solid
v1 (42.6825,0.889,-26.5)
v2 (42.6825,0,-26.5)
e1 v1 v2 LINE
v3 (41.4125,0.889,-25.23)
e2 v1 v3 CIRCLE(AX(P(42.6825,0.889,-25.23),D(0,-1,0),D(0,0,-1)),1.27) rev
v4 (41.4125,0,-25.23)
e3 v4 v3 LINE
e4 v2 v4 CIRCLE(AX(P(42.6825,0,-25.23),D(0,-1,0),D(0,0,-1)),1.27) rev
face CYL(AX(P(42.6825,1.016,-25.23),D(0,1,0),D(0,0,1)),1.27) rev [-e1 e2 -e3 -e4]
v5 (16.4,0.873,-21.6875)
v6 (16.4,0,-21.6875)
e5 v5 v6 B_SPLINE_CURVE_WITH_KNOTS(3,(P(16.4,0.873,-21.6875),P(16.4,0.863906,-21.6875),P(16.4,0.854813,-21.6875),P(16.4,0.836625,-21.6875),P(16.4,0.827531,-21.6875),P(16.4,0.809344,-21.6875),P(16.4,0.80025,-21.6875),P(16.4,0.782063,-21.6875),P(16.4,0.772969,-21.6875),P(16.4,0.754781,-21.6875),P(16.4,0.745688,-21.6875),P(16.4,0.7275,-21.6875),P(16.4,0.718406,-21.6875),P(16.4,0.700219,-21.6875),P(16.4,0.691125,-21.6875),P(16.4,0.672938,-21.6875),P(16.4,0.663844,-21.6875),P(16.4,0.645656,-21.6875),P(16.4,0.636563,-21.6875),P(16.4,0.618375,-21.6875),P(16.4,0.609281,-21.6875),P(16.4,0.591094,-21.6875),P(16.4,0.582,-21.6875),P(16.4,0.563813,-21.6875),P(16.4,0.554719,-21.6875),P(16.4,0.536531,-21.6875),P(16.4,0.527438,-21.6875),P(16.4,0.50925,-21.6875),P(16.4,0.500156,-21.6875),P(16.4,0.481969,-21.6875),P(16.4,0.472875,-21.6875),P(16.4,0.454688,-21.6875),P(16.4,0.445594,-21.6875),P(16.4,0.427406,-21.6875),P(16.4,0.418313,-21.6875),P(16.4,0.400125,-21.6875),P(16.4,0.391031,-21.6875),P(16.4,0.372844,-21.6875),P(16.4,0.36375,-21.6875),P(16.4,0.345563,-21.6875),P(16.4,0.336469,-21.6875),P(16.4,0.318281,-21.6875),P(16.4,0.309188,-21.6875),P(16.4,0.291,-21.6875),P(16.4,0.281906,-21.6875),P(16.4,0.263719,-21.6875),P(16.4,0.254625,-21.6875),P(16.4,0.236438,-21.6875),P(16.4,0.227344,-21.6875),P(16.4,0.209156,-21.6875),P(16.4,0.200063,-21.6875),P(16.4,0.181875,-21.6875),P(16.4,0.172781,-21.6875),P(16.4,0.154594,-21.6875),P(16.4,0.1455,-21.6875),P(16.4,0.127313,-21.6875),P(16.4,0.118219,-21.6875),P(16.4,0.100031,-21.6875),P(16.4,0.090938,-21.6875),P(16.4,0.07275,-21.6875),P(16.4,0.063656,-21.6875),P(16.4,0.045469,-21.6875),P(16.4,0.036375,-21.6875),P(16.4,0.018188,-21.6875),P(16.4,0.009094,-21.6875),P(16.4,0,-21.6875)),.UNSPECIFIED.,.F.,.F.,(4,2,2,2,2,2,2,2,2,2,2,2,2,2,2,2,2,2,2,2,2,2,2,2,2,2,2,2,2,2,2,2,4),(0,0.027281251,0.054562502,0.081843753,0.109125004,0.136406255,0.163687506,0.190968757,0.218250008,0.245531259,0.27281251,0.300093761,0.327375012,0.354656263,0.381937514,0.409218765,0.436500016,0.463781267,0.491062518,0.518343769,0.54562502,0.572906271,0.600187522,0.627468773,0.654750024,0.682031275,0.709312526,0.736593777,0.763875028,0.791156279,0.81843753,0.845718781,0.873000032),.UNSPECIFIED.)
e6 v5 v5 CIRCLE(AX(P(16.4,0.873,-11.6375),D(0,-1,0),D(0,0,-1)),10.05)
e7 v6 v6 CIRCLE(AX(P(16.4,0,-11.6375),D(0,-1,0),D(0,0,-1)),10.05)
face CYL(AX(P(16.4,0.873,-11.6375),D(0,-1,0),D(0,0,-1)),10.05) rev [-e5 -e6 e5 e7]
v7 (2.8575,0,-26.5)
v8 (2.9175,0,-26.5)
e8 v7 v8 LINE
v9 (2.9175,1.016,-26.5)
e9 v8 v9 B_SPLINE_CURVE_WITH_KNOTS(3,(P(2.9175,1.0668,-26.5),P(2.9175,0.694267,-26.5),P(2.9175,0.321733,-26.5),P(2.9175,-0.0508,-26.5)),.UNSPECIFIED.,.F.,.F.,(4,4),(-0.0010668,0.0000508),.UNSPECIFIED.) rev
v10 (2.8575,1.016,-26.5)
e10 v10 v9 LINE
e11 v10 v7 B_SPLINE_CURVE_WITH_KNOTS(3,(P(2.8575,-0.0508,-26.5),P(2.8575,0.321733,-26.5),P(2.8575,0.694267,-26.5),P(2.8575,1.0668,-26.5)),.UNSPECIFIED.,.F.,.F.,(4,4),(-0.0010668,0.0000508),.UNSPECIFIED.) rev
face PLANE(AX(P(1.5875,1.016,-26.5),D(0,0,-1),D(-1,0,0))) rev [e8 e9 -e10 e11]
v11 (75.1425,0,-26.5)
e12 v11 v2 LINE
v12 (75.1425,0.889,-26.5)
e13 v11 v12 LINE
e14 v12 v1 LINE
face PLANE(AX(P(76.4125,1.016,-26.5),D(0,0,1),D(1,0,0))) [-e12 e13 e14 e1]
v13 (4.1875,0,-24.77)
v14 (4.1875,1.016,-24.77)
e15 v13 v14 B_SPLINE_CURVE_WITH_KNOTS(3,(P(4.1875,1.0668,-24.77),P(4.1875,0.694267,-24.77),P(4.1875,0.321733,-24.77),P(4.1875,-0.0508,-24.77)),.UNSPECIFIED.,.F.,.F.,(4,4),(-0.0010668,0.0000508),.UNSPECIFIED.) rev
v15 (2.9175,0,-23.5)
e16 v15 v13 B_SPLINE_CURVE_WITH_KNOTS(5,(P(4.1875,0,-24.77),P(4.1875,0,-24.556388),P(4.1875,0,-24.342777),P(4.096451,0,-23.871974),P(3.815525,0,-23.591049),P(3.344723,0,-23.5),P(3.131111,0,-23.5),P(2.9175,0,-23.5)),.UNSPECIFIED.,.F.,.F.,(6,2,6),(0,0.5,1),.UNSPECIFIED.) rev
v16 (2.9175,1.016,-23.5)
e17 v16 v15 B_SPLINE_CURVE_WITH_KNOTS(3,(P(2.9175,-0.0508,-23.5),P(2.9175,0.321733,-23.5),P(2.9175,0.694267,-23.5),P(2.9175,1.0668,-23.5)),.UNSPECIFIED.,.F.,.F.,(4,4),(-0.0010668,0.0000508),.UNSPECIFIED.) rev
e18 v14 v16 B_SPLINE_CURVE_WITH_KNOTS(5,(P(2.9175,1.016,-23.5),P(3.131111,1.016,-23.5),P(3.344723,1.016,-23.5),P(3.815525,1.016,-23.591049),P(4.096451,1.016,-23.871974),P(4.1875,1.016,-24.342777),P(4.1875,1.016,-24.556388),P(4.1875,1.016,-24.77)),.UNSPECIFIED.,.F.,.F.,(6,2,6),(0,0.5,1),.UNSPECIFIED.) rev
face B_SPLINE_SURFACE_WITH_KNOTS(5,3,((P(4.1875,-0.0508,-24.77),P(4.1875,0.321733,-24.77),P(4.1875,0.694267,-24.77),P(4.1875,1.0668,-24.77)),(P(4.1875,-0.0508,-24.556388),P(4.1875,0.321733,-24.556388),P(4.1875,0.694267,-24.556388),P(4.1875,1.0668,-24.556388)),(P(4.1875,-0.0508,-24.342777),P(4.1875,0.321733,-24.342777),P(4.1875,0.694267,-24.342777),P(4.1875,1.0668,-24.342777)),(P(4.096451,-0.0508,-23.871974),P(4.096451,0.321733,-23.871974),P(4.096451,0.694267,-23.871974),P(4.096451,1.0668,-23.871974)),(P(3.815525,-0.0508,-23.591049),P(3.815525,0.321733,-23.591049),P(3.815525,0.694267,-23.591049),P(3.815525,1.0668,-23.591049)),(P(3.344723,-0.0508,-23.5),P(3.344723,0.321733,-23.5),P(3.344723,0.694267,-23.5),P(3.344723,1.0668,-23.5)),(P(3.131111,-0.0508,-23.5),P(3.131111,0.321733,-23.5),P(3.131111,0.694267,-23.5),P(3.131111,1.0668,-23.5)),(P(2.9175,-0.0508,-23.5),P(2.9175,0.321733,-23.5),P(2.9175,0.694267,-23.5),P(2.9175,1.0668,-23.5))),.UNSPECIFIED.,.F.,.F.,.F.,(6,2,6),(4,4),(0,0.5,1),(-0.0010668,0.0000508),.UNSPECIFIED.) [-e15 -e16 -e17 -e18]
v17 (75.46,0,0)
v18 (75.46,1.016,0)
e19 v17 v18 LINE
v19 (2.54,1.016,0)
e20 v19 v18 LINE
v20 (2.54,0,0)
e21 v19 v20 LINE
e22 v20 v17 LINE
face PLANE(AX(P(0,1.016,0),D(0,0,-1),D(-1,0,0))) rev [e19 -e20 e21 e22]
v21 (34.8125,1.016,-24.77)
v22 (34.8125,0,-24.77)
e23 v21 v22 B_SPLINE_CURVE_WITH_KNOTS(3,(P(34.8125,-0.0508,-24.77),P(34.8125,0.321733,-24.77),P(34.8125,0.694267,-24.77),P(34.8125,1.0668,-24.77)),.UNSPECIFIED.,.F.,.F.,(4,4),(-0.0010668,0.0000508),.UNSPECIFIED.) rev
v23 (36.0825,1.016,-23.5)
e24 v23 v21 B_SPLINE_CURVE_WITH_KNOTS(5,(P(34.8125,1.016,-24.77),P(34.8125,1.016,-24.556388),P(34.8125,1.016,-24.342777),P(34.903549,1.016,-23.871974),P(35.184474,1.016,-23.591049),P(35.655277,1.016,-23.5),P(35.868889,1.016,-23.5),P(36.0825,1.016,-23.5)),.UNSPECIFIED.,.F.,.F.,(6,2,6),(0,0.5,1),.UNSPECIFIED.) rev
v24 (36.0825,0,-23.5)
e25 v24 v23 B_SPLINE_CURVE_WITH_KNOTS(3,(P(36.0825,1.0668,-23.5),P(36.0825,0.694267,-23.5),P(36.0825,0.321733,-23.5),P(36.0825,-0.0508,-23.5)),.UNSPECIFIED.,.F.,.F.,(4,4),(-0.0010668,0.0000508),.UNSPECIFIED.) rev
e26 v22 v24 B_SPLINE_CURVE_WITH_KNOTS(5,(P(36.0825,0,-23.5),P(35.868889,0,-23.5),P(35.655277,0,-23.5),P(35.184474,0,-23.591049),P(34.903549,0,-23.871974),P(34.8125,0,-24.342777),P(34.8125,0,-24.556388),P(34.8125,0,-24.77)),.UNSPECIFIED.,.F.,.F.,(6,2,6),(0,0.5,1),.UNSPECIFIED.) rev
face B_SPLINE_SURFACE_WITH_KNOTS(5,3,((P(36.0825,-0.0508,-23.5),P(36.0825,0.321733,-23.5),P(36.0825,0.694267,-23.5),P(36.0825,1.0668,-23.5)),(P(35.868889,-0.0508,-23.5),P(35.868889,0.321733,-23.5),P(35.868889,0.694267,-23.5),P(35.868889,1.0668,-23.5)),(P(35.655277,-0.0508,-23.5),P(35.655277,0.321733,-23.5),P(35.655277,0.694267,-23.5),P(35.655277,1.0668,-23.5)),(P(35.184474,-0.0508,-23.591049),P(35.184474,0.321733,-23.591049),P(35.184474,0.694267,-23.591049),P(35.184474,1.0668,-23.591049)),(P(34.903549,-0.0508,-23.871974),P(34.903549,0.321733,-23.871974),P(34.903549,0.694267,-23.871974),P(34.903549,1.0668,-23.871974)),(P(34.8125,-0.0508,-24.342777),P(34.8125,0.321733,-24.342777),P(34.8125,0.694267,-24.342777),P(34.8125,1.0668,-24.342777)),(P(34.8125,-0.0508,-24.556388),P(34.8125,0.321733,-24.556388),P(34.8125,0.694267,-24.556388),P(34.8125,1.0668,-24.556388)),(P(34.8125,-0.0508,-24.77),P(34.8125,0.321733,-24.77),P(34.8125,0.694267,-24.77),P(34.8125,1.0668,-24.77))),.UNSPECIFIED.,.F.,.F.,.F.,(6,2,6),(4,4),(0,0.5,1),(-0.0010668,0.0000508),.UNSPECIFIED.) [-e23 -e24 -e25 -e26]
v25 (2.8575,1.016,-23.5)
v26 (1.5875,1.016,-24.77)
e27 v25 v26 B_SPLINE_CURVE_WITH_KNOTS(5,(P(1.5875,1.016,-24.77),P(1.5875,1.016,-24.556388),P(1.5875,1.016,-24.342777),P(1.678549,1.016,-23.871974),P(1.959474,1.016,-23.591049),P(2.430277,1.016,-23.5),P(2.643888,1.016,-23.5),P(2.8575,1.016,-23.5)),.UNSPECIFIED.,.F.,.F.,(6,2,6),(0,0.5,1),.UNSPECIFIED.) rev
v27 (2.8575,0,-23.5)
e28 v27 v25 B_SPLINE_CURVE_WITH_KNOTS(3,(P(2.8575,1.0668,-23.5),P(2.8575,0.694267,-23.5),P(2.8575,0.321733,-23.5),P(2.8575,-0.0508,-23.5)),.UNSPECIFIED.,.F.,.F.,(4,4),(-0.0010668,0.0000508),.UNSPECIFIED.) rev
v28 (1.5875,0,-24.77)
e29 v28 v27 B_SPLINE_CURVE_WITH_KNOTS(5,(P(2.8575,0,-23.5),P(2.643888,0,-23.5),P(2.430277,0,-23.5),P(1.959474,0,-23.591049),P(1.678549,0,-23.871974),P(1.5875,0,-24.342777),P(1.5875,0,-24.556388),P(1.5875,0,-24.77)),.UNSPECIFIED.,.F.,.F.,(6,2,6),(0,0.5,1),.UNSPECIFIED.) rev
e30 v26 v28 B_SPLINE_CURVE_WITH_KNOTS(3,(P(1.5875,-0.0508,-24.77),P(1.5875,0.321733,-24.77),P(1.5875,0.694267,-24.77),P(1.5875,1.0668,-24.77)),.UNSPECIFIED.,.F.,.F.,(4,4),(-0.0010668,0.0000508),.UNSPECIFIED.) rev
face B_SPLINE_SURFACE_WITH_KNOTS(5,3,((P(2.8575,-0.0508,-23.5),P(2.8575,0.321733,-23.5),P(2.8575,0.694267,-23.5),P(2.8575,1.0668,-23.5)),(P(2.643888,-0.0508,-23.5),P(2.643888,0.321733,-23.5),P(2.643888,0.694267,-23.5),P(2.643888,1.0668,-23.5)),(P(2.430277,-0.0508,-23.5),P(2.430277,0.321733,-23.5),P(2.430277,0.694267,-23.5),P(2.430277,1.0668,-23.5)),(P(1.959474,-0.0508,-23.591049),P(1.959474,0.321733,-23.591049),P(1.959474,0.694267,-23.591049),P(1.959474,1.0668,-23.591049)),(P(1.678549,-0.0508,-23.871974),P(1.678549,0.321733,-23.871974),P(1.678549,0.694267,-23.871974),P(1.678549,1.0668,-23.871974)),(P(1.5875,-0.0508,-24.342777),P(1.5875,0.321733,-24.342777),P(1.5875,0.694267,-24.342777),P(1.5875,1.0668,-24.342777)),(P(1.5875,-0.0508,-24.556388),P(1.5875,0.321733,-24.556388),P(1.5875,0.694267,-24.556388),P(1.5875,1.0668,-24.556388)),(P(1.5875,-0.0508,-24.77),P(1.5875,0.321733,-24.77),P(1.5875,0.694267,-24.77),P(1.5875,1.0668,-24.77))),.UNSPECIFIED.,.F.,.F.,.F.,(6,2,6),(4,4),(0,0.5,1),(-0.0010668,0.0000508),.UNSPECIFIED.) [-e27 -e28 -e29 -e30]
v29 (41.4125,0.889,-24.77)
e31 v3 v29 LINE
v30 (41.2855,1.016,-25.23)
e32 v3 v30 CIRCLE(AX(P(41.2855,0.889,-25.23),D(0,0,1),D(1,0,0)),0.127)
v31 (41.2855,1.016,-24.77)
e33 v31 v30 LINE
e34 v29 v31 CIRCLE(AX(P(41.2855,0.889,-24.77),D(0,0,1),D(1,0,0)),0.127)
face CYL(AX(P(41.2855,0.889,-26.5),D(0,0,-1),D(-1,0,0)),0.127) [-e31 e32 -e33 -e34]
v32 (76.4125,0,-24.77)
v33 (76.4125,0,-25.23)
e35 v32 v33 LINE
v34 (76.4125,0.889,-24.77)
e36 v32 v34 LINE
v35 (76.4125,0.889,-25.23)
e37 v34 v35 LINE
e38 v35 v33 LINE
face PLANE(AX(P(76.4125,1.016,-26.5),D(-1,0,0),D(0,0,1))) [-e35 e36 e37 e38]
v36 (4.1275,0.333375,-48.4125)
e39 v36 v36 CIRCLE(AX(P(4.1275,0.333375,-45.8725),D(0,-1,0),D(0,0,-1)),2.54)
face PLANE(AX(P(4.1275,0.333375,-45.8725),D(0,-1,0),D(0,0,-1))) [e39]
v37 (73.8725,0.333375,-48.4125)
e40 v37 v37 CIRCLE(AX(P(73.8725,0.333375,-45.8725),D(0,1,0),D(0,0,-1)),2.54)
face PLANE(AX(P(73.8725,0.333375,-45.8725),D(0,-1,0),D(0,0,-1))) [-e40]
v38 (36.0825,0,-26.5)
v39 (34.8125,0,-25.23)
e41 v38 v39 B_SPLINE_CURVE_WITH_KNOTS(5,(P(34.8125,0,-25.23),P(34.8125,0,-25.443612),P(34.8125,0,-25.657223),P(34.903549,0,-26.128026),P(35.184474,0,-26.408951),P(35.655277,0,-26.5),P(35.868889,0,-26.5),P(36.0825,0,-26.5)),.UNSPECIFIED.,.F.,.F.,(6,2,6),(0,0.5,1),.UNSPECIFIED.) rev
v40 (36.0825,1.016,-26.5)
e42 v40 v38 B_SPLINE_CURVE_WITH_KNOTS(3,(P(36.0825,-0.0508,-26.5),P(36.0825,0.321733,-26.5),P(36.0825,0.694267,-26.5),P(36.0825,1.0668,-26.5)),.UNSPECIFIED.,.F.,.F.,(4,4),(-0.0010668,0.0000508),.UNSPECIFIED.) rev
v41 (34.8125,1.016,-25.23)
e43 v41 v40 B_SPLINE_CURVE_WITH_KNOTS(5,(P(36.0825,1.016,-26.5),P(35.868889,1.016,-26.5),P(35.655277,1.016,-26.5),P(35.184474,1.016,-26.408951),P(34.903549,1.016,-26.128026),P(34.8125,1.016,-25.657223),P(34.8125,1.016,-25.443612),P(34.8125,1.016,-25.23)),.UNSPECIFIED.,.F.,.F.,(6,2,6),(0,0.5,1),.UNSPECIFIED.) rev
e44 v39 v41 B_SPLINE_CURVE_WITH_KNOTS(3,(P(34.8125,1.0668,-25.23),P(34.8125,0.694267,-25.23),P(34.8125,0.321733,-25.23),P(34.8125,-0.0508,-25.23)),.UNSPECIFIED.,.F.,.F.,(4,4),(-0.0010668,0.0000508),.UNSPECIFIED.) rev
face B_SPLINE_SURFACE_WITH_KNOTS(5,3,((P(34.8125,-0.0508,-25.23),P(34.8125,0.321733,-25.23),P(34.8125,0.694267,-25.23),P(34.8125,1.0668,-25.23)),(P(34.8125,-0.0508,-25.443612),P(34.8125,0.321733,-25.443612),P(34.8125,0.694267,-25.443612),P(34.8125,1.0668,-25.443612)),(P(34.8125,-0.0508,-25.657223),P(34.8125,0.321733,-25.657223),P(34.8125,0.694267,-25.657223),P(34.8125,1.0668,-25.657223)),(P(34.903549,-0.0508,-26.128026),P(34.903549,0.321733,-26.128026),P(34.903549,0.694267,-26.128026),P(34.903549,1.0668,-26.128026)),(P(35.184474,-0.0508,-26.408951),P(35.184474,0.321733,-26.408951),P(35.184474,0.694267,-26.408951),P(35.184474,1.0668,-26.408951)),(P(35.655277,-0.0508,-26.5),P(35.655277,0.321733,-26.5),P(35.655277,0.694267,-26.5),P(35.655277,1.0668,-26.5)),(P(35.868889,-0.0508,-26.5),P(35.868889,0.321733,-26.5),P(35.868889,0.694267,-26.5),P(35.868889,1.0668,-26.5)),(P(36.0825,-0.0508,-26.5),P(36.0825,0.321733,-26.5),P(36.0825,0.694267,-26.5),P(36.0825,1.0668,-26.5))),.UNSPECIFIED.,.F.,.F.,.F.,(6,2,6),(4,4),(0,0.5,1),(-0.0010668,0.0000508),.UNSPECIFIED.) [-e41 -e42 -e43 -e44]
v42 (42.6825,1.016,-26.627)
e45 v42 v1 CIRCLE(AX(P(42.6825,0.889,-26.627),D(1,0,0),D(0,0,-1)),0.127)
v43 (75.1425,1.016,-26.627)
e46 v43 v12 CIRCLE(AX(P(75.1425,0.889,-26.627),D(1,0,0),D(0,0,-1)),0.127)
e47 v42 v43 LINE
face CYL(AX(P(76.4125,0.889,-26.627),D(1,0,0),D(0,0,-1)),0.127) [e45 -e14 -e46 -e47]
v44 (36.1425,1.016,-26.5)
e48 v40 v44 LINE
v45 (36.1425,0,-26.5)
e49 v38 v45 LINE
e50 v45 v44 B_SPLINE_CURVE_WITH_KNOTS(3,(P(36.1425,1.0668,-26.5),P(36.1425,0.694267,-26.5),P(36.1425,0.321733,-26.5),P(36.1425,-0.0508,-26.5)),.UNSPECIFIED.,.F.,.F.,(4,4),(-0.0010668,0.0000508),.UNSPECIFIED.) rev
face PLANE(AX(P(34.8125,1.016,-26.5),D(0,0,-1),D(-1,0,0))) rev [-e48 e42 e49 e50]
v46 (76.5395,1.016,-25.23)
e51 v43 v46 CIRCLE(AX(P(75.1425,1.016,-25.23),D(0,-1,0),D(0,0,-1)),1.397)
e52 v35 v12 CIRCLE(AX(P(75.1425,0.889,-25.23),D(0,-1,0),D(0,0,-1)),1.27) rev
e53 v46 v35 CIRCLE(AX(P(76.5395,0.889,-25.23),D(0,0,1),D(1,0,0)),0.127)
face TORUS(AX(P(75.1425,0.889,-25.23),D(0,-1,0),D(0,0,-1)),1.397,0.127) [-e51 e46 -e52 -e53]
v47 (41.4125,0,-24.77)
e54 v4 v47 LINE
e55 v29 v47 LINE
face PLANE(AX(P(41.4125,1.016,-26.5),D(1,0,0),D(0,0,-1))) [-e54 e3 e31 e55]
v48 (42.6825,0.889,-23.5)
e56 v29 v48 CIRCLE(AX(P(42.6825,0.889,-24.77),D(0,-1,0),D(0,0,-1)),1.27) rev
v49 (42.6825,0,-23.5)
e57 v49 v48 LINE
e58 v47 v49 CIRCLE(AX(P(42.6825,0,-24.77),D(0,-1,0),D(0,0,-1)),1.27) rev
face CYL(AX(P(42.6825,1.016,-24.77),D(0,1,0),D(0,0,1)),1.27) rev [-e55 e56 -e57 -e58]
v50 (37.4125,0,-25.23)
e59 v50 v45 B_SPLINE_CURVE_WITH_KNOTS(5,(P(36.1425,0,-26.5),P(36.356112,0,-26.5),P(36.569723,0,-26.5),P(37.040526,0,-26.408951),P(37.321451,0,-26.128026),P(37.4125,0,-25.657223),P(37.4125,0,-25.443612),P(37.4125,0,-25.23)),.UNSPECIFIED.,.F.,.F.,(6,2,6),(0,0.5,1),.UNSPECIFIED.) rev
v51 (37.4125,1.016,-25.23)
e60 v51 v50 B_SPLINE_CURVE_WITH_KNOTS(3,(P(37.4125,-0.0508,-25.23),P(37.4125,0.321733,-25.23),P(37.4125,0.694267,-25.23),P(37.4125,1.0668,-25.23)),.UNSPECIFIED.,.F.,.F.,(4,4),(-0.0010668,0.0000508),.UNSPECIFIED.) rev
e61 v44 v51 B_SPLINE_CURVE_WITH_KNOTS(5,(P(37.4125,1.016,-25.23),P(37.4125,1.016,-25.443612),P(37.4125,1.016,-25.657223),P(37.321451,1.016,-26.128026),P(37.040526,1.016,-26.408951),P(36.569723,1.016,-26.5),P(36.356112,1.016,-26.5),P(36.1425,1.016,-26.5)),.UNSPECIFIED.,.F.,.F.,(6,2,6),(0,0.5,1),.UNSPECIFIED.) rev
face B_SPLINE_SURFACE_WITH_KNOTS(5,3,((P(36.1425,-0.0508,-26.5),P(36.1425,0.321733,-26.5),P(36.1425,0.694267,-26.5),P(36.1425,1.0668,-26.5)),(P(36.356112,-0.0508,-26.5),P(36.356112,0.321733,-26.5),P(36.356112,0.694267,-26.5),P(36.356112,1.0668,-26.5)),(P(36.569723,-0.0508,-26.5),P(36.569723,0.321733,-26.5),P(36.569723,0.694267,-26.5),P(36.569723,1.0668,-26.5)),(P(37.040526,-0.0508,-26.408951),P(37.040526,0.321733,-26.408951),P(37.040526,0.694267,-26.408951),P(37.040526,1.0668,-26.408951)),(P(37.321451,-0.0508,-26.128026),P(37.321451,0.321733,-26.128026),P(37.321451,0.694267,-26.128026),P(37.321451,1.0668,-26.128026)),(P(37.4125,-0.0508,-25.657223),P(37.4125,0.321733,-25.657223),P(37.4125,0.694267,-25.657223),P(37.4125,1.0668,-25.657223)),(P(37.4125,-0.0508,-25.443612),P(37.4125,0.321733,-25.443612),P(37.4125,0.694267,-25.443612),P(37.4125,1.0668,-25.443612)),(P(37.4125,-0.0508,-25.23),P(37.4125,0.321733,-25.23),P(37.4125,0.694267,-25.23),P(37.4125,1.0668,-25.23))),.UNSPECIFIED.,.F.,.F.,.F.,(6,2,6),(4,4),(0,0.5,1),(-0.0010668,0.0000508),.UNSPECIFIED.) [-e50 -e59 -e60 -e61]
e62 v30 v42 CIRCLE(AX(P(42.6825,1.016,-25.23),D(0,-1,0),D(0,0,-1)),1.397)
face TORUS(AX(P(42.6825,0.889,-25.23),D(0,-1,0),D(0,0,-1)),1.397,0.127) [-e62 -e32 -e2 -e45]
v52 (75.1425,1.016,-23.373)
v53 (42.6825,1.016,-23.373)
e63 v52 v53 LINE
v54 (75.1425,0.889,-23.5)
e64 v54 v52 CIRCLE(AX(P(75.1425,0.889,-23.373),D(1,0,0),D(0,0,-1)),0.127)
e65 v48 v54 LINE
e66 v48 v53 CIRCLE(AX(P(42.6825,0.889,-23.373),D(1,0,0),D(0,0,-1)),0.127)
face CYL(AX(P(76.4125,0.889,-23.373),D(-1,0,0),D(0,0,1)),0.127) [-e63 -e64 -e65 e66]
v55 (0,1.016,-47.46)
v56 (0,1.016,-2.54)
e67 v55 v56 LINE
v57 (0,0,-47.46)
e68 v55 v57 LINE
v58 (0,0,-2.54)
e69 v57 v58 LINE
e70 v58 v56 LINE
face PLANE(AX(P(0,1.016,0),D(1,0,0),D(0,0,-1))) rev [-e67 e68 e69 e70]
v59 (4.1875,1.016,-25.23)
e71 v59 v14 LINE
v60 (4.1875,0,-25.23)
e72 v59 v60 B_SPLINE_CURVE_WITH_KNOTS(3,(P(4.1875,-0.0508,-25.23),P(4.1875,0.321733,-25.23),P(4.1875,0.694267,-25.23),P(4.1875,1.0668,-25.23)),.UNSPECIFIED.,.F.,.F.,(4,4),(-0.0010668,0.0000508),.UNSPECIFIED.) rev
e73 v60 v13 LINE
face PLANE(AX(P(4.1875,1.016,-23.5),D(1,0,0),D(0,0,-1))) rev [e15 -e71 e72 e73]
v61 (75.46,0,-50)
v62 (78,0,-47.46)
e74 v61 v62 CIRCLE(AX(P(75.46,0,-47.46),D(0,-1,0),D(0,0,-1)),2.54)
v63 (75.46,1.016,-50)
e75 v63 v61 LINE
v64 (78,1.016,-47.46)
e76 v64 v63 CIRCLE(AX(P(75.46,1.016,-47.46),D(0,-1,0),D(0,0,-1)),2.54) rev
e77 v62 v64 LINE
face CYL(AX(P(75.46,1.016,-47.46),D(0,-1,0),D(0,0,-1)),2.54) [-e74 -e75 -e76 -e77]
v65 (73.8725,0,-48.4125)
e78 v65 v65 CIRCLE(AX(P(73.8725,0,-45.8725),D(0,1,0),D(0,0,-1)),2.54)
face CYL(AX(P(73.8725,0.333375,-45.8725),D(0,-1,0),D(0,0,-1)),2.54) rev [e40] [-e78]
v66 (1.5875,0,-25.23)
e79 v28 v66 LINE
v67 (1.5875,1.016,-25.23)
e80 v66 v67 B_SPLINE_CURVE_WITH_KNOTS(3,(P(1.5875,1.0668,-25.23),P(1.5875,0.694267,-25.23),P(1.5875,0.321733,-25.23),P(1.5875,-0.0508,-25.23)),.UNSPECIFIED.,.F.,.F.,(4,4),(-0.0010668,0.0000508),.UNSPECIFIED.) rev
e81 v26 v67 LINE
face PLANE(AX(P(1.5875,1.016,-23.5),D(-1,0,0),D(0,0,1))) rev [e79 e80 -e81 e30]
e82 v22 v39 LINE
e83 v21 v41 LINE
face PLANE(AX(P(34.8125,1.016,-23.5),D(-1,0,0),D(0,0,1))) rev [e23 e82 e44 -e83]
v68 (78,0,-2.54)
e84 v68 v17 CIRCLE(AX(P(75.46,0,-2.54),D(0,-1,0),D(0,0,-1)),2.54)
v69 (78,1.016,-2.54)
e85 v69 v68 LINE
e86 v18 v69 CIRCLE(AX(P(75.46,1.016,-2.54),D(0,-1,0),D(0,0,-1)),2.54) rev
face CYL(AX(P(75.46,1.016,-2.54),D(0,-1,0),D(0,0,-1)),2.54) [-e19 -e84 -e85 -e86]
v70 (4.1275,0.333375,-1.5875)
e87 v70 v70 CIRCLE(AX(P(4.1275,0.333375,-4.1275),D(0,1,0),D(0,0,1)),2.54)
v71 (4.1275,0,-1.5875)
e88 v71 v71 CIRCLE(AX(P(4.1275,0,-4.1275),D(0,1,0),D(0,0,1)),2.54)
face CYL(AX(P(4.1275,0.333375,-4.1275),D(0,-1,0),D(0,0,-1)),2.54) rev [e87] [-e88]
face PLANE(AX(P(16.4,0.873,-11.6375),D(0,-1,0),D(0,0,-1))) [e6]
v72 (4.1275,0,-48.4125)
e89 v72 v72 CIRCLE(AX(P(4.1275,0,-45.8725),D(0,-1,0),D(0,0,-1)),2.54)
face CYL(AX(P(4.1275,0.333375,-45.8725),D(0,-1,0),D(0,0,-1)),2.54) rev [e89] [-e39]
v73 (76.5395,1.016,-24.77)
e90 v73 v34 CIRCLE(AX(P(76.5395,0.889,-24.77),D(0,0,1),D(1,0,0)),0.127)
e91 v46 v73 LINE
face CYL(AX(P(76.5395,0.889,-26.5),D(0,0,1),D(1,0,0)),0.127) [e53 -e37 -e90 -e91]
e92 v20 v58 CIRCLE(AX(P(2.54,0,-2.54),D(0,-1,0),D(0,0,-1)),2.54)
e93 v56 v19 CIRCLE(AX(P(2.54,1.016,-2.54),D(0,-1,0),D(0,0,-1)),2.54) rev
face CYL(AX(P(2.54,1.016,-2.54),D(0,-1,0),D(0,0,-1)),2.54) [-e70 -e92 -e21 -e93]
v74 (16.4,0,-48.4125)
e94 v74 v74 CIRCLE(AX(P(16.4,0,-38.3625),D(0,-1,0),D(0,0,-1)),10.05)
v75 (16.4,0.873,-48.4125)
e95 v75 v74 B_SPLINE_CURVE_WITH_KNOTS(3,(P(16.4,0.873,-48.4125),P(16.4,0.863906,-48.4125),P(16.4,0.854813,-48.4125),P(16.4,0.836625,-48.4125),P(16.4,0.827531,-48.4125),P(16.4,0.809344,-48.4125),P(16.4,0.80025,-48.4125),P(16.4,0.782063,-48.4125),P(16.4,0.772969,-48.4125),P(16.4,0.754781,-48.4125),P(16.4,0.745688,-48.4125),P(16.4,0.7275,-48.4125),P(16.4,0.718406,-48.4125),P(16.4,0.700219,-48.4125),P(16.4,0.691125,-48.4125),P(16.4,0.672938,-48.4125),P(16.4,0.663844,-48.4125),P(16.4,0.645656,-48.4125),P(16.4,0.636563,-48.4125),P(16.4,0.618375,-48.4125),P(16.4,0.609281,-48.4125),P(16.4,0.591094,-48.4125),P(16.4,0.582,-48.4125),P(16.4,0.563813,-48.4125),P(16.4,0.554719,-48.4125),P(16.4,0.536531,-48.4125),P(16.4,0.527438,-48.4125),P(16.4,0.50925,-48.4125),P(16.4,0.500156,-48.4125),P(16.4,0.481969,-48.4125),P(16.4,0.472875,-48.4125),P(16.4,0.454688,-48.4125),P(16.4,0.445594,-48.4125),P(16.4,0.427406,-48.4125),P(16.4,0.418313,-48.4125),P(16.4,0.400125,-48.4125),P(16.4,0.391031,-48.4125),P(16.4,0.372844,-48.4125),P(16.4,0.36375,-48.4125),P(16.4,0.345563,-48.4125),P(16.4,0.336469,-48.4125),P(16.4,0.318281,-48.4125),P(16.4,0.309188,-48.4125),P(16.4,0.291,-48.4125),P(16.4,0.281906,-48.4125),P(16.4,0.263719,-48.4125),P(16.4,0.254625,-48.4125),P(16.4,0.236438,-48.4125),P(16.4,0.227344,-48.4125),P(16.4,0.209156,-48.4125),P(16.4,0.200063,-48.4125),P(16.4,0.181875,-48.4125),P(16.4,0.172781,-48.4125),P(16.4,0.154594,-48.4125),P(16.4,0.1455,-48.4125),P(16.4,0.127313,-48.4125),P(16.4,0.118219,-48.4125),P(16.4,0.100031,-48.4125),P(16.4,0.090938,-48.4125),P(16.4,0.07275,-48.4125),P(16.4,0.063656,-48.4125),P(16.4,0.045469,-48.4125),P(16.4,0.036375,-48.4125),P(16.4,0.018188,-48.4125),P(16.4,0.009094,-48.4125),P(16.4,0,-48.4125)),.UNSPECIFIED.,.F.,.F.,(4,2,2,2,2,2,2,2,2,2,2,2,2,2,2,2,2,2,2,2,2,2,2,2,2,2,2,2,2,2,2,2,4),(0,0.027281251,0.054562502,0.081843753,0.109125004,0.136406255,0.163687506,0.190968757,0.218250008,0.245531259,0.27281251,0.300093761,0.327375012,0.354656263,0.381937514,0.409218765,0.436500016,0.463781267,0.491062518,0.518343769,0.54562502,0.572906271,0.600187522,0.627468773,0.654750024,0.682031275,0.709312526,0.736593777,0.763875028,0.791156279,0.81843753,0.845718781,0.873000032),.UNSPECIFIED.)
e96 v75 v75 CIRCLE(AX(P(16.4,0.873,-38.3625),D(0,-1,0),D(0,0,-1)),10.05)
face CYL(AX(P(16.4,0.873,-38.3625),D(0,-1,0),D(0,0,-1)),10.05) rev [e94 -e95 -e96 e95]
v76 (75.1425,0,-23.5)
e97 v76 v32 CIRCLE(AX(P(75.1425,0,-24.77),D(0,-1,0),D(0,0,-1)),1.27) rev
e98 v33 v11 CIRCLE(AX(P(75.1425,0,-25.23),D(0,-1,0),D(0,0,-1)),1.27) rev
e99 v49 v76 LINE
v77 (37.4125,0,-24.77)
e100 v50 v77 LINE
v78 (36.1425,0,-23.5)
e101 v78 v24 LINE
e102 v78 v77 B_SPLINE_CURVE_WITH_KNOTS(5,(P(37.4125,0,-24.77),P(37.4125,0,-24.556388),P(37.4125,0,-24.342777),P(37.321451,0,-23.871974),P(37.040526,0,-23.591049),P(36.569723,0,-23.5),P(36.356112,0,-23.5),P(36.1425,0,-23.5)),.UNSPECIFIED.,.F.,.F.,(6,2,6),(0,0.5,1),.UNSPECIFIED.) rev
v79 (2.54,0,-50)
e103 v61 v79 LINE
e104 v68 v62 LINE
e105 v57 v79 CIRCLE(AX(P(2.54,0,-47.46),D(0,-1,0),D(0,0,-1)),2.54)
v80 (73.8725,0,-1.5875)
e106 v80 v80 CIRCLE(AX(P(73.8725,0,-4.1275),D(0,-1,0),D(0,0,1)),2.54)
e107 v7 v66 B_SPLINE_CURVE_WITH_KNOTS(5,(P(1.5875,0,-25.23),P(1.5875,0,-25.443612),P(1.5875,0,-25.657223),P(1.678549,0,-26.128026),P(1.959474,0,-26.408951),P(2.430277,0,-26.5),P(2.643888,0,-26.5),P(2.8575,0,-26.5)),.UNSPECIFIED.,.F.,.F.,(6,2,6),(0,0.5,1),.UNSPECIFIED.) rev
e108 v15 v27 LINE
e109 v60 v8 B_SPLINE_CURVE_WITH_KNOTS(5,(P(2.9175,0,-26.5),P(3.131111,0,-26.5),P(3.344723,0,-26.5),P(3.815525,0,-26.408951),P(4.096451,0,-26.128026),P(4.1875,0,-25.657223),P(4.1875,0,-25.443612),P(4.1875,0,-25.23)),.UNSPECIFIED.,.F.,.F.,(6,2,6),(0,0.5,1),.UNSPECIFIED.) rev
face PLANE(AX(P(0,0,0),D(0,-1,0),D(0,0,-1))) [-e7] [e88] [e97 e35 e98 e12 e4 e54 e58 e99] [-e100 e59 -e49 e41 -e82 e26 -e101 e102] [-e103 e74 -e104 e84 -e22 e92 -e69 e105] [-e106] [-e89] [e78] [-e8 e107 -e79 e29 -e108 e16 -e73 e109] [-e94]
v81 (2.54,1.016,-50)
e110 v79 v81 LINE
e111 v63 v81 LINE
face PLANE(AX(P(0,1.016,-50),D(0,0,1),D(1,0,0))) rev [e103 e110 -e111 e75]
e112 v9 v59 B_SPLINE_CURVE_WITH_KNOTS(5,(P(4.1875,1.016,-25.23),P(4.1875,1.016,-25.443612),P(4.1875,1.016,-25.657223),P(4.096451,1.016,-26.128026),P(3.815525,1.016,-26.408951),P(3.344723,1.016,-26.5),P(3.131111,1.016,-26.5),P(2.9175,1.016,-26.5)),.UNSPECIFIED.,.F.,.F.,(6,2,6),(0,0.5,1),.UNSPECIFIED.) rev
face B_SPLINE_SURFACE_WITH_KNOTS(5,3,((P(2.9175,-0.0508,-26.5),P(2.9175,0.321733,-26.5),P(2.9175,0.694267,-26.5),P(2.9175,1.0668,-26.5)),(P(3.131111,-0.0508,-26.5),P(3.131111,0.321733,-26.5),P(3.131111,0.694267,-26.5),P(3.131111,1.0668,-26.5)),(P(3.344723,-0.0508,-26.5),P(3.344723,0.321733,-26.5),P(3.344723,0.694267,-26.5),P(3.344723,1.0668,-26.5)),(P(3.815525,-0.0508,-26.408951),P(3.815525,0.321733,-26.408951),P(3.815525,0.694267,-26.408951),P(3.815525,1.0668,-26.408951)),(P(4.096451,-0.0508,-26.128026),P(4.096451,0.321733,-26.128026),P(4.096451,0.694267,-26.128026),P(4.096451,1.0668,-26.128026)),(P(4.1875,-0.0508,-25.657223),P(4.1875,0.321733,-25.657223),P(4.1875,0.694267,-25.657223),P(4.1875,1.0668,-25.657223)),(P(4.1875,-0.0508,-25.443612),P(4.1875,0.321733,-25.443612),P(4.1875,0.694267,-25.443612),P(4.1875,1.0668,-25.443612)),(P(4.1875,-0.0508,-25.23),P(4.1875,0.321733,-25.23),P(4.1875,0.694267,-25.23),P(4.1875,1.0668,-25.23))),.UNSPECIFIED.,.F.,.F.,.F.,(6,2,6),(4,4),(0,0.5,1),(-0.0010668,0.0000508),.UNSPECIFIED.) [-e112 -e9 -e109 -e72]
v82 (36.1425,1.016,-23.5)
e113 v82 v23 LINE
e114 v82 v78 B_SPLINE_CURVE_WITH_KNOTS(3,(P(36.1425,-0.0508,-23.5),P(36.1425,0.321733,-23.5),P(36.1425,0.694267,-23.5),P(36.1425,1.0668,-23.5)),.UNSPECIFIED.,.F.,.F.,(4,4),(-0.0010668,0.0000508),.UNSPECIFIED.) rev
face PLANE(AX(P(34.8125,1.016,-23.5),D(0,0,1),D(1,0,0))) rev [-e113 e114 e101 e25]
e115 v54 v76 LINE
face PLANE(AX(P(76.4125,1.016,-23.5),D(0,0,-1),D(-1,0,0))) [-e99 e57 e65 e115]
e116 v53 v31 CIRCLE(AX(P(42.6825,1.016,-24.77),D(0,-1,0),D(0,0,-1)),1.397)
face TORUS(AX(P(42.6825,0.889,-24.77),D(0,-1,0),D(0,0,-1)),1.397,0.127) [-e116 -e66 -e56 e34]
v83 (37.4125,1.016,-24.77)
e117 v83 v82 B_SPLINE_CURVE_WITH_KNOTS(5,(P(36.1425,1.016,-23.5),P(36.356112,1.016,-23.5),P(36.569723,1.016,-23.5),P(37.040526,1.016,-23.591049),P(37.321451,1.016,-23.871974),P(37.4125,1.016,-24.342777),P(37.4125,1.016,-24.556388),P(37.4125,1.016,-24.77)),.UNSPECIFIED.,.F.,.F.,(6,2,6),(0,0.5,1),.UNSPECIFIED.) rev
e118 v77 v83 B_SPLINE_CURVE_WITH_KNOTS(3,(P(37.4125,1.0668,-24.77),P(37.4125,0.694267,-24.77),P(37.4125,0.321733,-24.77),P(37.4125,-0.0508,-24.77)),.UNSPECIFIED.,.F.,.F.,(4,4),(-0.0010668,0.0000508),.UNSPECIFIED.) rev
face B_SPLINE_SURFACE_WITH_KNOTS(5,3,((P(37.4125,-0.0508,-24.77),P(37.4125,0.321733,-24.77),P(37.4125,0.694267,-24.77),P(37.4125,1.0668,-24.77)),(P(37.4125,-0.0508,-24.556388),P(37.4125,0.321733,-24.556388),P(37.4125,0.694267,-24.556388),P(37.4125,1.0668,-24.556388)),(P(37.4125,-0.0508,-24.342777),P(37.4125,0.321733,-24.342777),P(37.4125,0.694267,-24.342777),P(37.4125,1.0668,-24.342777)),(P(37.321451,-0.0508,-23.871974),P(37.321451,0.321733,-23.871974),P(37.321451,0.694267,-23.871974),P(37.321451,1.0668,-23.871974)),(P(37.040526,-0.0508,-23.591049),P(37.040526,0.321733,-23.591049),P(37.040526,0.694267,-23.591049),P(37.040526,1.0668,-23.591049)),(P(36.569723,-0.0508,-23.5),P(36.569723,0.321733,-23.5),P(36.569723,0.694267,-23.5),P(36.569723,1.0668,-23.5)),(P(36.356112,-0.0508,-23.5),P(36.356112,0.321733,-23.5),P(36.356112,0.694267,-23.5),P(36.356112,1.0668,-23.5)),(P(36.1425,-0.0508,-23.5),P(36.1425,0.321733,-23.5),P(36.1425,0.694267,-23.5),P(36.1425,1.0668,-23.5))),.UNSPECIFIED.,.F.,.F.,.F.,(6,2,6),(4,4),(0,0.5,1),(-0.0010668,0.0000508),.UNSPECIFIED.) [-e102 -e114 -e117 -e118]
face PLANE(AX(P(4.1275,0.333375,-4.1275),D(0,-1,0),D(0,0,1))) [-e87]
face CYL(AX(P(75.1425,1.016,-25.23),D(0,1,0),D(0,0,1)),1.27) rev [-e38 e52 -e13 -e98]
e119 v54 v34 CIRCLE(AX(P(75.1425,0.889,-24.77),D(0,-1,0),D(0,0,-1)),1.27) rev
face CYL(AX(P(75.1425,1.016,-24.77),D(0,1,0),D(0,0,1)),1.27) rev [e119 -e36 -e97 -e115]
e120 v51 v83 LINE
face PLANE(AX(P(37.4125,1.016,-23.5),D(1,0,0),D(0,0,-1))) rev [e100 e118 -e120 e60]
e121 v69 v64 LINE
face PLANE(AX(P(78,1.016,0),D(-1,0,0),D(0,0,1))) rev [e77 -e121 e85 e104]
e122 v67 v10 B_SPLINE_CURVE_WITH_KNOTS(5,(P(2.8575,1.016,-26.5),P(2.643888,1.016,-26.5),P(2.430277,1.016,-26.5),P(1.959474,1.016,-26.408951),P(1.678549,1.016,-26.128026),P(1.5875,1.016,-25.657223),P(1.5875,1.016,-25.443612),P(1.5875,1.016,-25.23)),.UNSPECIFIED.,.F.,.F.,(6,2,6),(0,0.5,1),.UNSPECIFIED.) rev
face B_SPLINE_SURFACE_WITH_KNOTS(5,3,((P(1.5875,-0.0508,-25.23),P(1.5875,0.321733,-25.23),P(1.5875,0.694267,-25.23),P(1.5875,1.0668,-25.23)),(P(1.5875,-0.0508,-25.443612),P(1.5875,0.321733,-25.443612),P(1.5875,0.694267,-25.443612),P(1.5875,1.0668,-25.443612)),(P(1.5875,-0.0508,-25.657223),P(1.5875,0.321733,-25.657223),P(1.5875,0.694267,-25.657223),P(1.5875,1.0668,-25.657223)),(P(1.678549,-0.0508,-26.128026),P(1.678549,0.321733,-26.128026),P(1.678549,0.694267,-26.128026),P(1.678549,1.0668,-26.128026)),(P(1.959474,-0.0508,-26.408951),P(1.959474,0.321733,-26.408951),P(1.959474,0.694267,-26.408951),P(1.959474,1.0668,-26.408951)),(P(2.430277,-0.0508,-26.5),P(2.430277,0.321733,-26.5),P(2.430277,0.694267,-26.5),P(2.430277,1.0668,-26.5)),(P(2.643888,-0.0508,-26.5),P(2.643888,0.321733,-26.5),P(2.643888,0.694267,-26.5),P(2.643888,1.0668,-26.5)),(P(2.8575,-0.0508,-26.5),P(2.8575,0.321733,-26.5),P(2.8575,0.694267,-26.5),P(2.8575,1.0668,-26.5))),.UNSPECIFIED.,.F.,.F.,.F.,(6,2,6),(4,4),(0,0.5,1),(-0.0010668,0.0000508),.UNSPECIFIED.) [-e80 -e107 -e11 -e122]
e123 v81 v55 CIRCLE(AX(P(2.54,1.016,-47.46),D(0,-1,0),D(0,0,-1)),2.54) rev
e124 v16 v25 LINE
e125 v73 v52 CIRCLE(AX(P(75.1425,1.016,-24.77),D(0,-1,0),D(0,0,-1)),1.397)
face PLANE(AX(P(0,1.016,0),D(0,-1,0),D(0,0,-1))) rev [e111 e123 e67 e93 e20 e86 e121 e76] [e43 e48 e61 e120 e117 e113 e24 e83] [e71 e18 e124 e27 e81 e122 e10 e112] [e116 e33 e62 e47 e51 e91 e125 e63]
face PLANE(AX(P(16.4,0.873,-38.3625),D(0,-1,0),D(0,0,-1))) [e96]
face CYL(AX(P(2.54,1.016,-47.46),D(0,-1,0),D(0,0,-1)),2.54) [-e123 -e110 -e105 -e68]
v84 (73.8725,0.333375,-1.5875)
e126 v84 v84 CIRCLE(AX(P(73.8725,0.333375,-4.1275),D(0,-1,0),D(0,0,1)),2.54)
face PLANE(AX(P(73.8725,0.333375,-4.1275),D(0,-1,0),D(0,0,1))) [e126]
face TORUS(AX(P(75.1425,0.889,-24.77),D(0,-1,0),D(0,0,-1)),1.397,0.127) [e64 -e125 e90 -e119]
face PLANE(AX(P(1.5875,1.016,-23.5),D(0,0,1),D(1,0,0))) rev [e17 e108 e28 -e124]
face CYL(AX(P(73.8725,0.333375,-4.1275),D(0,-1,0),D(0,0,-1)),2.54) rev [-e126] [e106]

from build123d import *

# Parameters (mm, degrees)
SKETCH1_W                   = 78
SKETCH1_H                   = 50
STEEL_FACE_DEPTH            = 1.016
CARD_EDGES_R                = 2.54
SKETCH2_R                   = 2.54
MAGNET_CAVITY_DEPTH         = 0.333375
MIRROR2_COPY_1_SKETCH_R     = 2.54
MIRROR2_COPY_1_DEPTH        = 0.333375
SKETCH3_R                   = 10.049999966
BATTERY_POCKETS_DEPTH       = 0.873000032
SKETCH5_W                   = 35.000000104
SKETCH5_H                   = 3.000000096
LED_SLOT_DEPTH              = 93.655449144
LED_SLOT_CORNER_ROUND_R     = 1.27
LED_SLOT_SURFACE_ROUND_R    = 0.127
SKETCH6_W                   = 2.59999988
SKETCH6_H                   = 3.000000096
ALS_DATA_SENSOR_SLOT_DEPTH  = 93.655449144
SKETCH8_W                   = 2.59999988
SKETCH8_H                   = 3.000000096
ALS_CLOCK_SENSOR_SLOT_DEPTH = 93.655449144
FILLET4_SIZE                = 1.27


with BuildPart() as part:
    # Sketch1 → steel_face (new body)
    with BuildSketch(Plane(origin=(0, 0, 0), x_dir=(1, 0, 0), z_dir=(0, 1, 0))):
        with Locations((39, 25)):
            Rectangle(SKETCH1_W, SKETCH1_H)
    extrude(amount=STEEL_FACE_DEPTH)

    # card_edges
    card_edges_edges = [part.edges().sort_by_distance(p)[0] for p in [
        (0, 0.508, -50),
        (78, 0.508, -50),
        (78, 0.508, 0),
        (0, 0.508, 0),
    ]]
    fillet(card_edges_edges, radius=CARD_EDGES_R)

    # Sketch2 → magnet_cavity (cut)
    with BuildSketch(Plane.XZ):
        with Locations(Location((4.1275, -45.8725, 0), (0, 0, 270))):
            Circle(SKETCH2_R)
    magnet_cavity = extrude(amount=-MAGNET_CAVITY_DEPTH, mode=Mode.SUBTRACT)

    # Mirror1: magnet_cavity across plane
    add(magnet_cavity.mirror(Plane.XY.offset(-25.000000038)), mode=Mode.SUBTRACT)

    # Mirror2: magnet_cavity across plane
    add(magnet_cavity.mirror(Plane(origin=(38.999999978, 0, 0), x_dir=(0, 0, 1), z_dir=(1, 0, 0))), mode=Mode.SUBTRACT)

    # Mirror2 copy 1 sketch → Mirror2 copy 1 (cut)
    with BuildSketch(Plane(origin=(77.999999956, 0, -50.000000076), x_dir=(-1, 0, 0), z_dir=(0, -1, 0))):
        with Locations(Location((4.1275, -45.8725, 0), (0, 0, 270))):
            Circle(MIRROR2_COPY_1_SKETCH_R)
    extrude(amount=-MIRROR2_COPY_1_DEPTH, mode=Mode.SUBTRACT)

    # Sketch3 → battery_pockets (cut)
    with BuildSketch(Plane.XZ):
        with Locations(Location((16.399999966, -11.637499966, 0), (0, 0, 270))):
            Circle(SKETCH3_R)
        with Locations(Location((16.399999966, -38.362500034, 0), (0, 0, 270))):
            Circle(SKETCH3_R)
    extrude(amount=-BATTERY_POCKETS_DEPTH, mode=Mode.SUBTRACT)

    # Sketch5 → led_slot (cut, through all)
    with BuildSketch(Plane(origin=(0, 0, 0), x_dir=(1, 0, 0), z_dir=(0, 1, 0))):
        with Locations((58.912499948, 25.000000038)):
            Rectangle(SKETCH5_W, SKETCH5_H)
    extrude(amount=LED_SLOT_DEPTH, mode=Mode.SUBTRACT)

    # led_slot_corner_round
    led_slot_corner_round_edges = [part.edges().sort_by_distance(p)[0] for p in [
        (76.4125, 0.508, -23.49999999),
        (76.4125, 0.508, -26.500000086),
        (41.412499896, 0.508, -26.500000086),
        (41.412499896, 0.508, -23.49999999),
    ]]
    fillet(led_slot_corner_round_edges, radius=LED_SLOT_CORNER_ROUND_R)

    # led_slot_surface_round
    led_slot_surface_round_edges = [part.edges().sort_by_distance(p)[0] for p in [
        (58.912499948, 1.016, -26.500000086),
        (41.412499896, 1.016, -25.000000038),
        (58.912499948, 1.016, -23.49999999),
        (76.4125, 1.016, -25.000000038),
        (41.784474284, 1.016, -26.128025698),
        (41.784474284, 1.016, -23.871974378),
        (76.040525612, 1.016, -26.128025698),
        (76.040525612, 1.016, -23.871974378),
    ]]
    fillet(led_slot_surface_round_edges, radius=LED_SLOT_SURFACE_ROUND_R)

    # Sketch6 → als_data_sensor_slot (cut, through all)
    with BuildSketch(Plane.XZ):
        with Locations((2.88749994, -25.000000038)):
            Rectangle(SKETCH6_W, SKETCH6_H)
    extrude(amount=-ALS_DATA_SENSOR_SLOT_DEPTH, mode=Mode.SUBTRACT)

    # Sketch8 → als_clock_sensor_slot (cut, through all)
    with BuildSketch(Plane.XZ):
        with Locations((36.112500038, -25.000000038)):
            Rectangle(SKETCH8_W, SKETCH8_H)
    extrude(amount=-ALS_CLOCK_SENSOR_SLOT_DEPTH, mode=Mode.SUBTRACT)

    # Fillet4
    # a fillet whose section is not a circle: 1.27 mm, written as the material it adds along each edge
    with BuildSketch(Plane(origin=(1.5875, 0, -26.500000086), x_dir=(0, 0, 1), z_dir=(0, 1, 0)), Plane(origin=(1.5875, 0, -23.49999999), x_dir=(1, 0, 0), z_dir=(0, 1, 0)), Plane(origin=(34.812500098, 0, -23.49999999), x_dir=(1, 0, 0), z_dir=(0, 1, 0))) as fillet4_piece_1:
        with BuildLine():
            add(Edge.make_bspline([(FILLET4_SIZE, 0), (FILLET4_SIZE * 0.831801948466, 0), (FILLET4_SIZE * 0.663603896932, 0), (FILLET4_SIZE * 0.292893218813, FILLET4_SIZE * 0.0716919198361), (FILLET4_SIZE * 0.0716919198361, FILLET4_SIZE * 0.292893218813), (0, FILLET4_SIZE * 0.663603896932), (0, FILLET4_SIZE * 0.831801948466), (0, FILLET4_SIZE)], knots=[0, 0, 0, 0, 0, 0, 0.5, 0.5, 1, 1, 1, 1, 1, 1], degree=5))
            Line((0, FILLET4_SIZE), (-FILLET4_SIZE * 0.02, FILLET4_SIZE))
            Line((-FILLET4_SIZE * 0.02, FILLET4_SIZE), (-FILLET4_SIZE * 0.02, -FILLET4_SIZE * 0.02))
            Line((-FILLET4_SIZE * 0.02, -FILLET4_SIZE * 0.02), (FILLET4_SIZE, -FILLET4_SIZE * 0.02))
            Line((FILLET4_SIZE, -FILLET4_SIZE * 0.02), (FILLET4_SIZE, 0))
        make_face()
    extrude(amount=1.016)
    with BuildSketch(Plane(origin=(4.18749988, 0, -26.500000086), x_dir=(0, 0, 1), z_dir=(0, 1, 0)), Plane(origin=(4.18749988, 0, -23.49999999), x_dir=(-1, 0, 0), z_dir=(0, 1, 0)), Plane(origin=(34.812500098, 0, -26.500000086), x_dir=(1, 0, 0), z_dir=(0, 1, 0)), Plane(origin=(37.412499978, 0, -26.500000086), x_dir=(0, 0, 1), z_dir=(0, 1, 0)), Plane(origin=(37.412499978, 0, -23.49999999), x_dir=(-1, 0, 0), z_dir=(0, 1, 0))) as fillet4_piece_2:
        with BuildLine():
            add(Edge.make_bspline([(FILLET4_SIZE, 0), (FILLET4_SIZE * 0.831801948466, 0), (FILLET4_SIZE * 0.663603896932, 0), (FILLET4_SIZE * 0.292893218813, -FILLET4_SIZE * 0.0716919198361), (FILLET4_SIZE * 0.0716919198361, -FILLET4_SIZE * 0.292893218813), (0, -FILLET4_SIZE * 0.663603896932), (0, -FILLET4_SIZE * 0.831801948466), (0, -FILLET4_SIZE)], knots=[0, 0, 0, 0, 0, 0, 0.5, 0.5, 1, 1, 1, 1, 1, 1], degree=5))
            Line((0, -FILLET4_SIZE), (-FILLET4_SIZE * 0.02, -FILLET4_SIZE))
            Line((-FILLET4_SIZE * 0.02, -FILLET4_SIZE), (-FILLET4_SIZE * 0.02, FILLET4_SIZE * 0.02))
            Line((-FILLET4_SIZE * 0.02, FILLET4_SIZE * 0.02), (FILLET4_SIZE, FILLET4_SIZE * 0.02))
            Line((FILLET4_SIZE, FILLET4_SIZE * 0.02), (FILLET4_SIZE, 0))
        make_face()
    extrude(amount=1.016)


solid = part.part
